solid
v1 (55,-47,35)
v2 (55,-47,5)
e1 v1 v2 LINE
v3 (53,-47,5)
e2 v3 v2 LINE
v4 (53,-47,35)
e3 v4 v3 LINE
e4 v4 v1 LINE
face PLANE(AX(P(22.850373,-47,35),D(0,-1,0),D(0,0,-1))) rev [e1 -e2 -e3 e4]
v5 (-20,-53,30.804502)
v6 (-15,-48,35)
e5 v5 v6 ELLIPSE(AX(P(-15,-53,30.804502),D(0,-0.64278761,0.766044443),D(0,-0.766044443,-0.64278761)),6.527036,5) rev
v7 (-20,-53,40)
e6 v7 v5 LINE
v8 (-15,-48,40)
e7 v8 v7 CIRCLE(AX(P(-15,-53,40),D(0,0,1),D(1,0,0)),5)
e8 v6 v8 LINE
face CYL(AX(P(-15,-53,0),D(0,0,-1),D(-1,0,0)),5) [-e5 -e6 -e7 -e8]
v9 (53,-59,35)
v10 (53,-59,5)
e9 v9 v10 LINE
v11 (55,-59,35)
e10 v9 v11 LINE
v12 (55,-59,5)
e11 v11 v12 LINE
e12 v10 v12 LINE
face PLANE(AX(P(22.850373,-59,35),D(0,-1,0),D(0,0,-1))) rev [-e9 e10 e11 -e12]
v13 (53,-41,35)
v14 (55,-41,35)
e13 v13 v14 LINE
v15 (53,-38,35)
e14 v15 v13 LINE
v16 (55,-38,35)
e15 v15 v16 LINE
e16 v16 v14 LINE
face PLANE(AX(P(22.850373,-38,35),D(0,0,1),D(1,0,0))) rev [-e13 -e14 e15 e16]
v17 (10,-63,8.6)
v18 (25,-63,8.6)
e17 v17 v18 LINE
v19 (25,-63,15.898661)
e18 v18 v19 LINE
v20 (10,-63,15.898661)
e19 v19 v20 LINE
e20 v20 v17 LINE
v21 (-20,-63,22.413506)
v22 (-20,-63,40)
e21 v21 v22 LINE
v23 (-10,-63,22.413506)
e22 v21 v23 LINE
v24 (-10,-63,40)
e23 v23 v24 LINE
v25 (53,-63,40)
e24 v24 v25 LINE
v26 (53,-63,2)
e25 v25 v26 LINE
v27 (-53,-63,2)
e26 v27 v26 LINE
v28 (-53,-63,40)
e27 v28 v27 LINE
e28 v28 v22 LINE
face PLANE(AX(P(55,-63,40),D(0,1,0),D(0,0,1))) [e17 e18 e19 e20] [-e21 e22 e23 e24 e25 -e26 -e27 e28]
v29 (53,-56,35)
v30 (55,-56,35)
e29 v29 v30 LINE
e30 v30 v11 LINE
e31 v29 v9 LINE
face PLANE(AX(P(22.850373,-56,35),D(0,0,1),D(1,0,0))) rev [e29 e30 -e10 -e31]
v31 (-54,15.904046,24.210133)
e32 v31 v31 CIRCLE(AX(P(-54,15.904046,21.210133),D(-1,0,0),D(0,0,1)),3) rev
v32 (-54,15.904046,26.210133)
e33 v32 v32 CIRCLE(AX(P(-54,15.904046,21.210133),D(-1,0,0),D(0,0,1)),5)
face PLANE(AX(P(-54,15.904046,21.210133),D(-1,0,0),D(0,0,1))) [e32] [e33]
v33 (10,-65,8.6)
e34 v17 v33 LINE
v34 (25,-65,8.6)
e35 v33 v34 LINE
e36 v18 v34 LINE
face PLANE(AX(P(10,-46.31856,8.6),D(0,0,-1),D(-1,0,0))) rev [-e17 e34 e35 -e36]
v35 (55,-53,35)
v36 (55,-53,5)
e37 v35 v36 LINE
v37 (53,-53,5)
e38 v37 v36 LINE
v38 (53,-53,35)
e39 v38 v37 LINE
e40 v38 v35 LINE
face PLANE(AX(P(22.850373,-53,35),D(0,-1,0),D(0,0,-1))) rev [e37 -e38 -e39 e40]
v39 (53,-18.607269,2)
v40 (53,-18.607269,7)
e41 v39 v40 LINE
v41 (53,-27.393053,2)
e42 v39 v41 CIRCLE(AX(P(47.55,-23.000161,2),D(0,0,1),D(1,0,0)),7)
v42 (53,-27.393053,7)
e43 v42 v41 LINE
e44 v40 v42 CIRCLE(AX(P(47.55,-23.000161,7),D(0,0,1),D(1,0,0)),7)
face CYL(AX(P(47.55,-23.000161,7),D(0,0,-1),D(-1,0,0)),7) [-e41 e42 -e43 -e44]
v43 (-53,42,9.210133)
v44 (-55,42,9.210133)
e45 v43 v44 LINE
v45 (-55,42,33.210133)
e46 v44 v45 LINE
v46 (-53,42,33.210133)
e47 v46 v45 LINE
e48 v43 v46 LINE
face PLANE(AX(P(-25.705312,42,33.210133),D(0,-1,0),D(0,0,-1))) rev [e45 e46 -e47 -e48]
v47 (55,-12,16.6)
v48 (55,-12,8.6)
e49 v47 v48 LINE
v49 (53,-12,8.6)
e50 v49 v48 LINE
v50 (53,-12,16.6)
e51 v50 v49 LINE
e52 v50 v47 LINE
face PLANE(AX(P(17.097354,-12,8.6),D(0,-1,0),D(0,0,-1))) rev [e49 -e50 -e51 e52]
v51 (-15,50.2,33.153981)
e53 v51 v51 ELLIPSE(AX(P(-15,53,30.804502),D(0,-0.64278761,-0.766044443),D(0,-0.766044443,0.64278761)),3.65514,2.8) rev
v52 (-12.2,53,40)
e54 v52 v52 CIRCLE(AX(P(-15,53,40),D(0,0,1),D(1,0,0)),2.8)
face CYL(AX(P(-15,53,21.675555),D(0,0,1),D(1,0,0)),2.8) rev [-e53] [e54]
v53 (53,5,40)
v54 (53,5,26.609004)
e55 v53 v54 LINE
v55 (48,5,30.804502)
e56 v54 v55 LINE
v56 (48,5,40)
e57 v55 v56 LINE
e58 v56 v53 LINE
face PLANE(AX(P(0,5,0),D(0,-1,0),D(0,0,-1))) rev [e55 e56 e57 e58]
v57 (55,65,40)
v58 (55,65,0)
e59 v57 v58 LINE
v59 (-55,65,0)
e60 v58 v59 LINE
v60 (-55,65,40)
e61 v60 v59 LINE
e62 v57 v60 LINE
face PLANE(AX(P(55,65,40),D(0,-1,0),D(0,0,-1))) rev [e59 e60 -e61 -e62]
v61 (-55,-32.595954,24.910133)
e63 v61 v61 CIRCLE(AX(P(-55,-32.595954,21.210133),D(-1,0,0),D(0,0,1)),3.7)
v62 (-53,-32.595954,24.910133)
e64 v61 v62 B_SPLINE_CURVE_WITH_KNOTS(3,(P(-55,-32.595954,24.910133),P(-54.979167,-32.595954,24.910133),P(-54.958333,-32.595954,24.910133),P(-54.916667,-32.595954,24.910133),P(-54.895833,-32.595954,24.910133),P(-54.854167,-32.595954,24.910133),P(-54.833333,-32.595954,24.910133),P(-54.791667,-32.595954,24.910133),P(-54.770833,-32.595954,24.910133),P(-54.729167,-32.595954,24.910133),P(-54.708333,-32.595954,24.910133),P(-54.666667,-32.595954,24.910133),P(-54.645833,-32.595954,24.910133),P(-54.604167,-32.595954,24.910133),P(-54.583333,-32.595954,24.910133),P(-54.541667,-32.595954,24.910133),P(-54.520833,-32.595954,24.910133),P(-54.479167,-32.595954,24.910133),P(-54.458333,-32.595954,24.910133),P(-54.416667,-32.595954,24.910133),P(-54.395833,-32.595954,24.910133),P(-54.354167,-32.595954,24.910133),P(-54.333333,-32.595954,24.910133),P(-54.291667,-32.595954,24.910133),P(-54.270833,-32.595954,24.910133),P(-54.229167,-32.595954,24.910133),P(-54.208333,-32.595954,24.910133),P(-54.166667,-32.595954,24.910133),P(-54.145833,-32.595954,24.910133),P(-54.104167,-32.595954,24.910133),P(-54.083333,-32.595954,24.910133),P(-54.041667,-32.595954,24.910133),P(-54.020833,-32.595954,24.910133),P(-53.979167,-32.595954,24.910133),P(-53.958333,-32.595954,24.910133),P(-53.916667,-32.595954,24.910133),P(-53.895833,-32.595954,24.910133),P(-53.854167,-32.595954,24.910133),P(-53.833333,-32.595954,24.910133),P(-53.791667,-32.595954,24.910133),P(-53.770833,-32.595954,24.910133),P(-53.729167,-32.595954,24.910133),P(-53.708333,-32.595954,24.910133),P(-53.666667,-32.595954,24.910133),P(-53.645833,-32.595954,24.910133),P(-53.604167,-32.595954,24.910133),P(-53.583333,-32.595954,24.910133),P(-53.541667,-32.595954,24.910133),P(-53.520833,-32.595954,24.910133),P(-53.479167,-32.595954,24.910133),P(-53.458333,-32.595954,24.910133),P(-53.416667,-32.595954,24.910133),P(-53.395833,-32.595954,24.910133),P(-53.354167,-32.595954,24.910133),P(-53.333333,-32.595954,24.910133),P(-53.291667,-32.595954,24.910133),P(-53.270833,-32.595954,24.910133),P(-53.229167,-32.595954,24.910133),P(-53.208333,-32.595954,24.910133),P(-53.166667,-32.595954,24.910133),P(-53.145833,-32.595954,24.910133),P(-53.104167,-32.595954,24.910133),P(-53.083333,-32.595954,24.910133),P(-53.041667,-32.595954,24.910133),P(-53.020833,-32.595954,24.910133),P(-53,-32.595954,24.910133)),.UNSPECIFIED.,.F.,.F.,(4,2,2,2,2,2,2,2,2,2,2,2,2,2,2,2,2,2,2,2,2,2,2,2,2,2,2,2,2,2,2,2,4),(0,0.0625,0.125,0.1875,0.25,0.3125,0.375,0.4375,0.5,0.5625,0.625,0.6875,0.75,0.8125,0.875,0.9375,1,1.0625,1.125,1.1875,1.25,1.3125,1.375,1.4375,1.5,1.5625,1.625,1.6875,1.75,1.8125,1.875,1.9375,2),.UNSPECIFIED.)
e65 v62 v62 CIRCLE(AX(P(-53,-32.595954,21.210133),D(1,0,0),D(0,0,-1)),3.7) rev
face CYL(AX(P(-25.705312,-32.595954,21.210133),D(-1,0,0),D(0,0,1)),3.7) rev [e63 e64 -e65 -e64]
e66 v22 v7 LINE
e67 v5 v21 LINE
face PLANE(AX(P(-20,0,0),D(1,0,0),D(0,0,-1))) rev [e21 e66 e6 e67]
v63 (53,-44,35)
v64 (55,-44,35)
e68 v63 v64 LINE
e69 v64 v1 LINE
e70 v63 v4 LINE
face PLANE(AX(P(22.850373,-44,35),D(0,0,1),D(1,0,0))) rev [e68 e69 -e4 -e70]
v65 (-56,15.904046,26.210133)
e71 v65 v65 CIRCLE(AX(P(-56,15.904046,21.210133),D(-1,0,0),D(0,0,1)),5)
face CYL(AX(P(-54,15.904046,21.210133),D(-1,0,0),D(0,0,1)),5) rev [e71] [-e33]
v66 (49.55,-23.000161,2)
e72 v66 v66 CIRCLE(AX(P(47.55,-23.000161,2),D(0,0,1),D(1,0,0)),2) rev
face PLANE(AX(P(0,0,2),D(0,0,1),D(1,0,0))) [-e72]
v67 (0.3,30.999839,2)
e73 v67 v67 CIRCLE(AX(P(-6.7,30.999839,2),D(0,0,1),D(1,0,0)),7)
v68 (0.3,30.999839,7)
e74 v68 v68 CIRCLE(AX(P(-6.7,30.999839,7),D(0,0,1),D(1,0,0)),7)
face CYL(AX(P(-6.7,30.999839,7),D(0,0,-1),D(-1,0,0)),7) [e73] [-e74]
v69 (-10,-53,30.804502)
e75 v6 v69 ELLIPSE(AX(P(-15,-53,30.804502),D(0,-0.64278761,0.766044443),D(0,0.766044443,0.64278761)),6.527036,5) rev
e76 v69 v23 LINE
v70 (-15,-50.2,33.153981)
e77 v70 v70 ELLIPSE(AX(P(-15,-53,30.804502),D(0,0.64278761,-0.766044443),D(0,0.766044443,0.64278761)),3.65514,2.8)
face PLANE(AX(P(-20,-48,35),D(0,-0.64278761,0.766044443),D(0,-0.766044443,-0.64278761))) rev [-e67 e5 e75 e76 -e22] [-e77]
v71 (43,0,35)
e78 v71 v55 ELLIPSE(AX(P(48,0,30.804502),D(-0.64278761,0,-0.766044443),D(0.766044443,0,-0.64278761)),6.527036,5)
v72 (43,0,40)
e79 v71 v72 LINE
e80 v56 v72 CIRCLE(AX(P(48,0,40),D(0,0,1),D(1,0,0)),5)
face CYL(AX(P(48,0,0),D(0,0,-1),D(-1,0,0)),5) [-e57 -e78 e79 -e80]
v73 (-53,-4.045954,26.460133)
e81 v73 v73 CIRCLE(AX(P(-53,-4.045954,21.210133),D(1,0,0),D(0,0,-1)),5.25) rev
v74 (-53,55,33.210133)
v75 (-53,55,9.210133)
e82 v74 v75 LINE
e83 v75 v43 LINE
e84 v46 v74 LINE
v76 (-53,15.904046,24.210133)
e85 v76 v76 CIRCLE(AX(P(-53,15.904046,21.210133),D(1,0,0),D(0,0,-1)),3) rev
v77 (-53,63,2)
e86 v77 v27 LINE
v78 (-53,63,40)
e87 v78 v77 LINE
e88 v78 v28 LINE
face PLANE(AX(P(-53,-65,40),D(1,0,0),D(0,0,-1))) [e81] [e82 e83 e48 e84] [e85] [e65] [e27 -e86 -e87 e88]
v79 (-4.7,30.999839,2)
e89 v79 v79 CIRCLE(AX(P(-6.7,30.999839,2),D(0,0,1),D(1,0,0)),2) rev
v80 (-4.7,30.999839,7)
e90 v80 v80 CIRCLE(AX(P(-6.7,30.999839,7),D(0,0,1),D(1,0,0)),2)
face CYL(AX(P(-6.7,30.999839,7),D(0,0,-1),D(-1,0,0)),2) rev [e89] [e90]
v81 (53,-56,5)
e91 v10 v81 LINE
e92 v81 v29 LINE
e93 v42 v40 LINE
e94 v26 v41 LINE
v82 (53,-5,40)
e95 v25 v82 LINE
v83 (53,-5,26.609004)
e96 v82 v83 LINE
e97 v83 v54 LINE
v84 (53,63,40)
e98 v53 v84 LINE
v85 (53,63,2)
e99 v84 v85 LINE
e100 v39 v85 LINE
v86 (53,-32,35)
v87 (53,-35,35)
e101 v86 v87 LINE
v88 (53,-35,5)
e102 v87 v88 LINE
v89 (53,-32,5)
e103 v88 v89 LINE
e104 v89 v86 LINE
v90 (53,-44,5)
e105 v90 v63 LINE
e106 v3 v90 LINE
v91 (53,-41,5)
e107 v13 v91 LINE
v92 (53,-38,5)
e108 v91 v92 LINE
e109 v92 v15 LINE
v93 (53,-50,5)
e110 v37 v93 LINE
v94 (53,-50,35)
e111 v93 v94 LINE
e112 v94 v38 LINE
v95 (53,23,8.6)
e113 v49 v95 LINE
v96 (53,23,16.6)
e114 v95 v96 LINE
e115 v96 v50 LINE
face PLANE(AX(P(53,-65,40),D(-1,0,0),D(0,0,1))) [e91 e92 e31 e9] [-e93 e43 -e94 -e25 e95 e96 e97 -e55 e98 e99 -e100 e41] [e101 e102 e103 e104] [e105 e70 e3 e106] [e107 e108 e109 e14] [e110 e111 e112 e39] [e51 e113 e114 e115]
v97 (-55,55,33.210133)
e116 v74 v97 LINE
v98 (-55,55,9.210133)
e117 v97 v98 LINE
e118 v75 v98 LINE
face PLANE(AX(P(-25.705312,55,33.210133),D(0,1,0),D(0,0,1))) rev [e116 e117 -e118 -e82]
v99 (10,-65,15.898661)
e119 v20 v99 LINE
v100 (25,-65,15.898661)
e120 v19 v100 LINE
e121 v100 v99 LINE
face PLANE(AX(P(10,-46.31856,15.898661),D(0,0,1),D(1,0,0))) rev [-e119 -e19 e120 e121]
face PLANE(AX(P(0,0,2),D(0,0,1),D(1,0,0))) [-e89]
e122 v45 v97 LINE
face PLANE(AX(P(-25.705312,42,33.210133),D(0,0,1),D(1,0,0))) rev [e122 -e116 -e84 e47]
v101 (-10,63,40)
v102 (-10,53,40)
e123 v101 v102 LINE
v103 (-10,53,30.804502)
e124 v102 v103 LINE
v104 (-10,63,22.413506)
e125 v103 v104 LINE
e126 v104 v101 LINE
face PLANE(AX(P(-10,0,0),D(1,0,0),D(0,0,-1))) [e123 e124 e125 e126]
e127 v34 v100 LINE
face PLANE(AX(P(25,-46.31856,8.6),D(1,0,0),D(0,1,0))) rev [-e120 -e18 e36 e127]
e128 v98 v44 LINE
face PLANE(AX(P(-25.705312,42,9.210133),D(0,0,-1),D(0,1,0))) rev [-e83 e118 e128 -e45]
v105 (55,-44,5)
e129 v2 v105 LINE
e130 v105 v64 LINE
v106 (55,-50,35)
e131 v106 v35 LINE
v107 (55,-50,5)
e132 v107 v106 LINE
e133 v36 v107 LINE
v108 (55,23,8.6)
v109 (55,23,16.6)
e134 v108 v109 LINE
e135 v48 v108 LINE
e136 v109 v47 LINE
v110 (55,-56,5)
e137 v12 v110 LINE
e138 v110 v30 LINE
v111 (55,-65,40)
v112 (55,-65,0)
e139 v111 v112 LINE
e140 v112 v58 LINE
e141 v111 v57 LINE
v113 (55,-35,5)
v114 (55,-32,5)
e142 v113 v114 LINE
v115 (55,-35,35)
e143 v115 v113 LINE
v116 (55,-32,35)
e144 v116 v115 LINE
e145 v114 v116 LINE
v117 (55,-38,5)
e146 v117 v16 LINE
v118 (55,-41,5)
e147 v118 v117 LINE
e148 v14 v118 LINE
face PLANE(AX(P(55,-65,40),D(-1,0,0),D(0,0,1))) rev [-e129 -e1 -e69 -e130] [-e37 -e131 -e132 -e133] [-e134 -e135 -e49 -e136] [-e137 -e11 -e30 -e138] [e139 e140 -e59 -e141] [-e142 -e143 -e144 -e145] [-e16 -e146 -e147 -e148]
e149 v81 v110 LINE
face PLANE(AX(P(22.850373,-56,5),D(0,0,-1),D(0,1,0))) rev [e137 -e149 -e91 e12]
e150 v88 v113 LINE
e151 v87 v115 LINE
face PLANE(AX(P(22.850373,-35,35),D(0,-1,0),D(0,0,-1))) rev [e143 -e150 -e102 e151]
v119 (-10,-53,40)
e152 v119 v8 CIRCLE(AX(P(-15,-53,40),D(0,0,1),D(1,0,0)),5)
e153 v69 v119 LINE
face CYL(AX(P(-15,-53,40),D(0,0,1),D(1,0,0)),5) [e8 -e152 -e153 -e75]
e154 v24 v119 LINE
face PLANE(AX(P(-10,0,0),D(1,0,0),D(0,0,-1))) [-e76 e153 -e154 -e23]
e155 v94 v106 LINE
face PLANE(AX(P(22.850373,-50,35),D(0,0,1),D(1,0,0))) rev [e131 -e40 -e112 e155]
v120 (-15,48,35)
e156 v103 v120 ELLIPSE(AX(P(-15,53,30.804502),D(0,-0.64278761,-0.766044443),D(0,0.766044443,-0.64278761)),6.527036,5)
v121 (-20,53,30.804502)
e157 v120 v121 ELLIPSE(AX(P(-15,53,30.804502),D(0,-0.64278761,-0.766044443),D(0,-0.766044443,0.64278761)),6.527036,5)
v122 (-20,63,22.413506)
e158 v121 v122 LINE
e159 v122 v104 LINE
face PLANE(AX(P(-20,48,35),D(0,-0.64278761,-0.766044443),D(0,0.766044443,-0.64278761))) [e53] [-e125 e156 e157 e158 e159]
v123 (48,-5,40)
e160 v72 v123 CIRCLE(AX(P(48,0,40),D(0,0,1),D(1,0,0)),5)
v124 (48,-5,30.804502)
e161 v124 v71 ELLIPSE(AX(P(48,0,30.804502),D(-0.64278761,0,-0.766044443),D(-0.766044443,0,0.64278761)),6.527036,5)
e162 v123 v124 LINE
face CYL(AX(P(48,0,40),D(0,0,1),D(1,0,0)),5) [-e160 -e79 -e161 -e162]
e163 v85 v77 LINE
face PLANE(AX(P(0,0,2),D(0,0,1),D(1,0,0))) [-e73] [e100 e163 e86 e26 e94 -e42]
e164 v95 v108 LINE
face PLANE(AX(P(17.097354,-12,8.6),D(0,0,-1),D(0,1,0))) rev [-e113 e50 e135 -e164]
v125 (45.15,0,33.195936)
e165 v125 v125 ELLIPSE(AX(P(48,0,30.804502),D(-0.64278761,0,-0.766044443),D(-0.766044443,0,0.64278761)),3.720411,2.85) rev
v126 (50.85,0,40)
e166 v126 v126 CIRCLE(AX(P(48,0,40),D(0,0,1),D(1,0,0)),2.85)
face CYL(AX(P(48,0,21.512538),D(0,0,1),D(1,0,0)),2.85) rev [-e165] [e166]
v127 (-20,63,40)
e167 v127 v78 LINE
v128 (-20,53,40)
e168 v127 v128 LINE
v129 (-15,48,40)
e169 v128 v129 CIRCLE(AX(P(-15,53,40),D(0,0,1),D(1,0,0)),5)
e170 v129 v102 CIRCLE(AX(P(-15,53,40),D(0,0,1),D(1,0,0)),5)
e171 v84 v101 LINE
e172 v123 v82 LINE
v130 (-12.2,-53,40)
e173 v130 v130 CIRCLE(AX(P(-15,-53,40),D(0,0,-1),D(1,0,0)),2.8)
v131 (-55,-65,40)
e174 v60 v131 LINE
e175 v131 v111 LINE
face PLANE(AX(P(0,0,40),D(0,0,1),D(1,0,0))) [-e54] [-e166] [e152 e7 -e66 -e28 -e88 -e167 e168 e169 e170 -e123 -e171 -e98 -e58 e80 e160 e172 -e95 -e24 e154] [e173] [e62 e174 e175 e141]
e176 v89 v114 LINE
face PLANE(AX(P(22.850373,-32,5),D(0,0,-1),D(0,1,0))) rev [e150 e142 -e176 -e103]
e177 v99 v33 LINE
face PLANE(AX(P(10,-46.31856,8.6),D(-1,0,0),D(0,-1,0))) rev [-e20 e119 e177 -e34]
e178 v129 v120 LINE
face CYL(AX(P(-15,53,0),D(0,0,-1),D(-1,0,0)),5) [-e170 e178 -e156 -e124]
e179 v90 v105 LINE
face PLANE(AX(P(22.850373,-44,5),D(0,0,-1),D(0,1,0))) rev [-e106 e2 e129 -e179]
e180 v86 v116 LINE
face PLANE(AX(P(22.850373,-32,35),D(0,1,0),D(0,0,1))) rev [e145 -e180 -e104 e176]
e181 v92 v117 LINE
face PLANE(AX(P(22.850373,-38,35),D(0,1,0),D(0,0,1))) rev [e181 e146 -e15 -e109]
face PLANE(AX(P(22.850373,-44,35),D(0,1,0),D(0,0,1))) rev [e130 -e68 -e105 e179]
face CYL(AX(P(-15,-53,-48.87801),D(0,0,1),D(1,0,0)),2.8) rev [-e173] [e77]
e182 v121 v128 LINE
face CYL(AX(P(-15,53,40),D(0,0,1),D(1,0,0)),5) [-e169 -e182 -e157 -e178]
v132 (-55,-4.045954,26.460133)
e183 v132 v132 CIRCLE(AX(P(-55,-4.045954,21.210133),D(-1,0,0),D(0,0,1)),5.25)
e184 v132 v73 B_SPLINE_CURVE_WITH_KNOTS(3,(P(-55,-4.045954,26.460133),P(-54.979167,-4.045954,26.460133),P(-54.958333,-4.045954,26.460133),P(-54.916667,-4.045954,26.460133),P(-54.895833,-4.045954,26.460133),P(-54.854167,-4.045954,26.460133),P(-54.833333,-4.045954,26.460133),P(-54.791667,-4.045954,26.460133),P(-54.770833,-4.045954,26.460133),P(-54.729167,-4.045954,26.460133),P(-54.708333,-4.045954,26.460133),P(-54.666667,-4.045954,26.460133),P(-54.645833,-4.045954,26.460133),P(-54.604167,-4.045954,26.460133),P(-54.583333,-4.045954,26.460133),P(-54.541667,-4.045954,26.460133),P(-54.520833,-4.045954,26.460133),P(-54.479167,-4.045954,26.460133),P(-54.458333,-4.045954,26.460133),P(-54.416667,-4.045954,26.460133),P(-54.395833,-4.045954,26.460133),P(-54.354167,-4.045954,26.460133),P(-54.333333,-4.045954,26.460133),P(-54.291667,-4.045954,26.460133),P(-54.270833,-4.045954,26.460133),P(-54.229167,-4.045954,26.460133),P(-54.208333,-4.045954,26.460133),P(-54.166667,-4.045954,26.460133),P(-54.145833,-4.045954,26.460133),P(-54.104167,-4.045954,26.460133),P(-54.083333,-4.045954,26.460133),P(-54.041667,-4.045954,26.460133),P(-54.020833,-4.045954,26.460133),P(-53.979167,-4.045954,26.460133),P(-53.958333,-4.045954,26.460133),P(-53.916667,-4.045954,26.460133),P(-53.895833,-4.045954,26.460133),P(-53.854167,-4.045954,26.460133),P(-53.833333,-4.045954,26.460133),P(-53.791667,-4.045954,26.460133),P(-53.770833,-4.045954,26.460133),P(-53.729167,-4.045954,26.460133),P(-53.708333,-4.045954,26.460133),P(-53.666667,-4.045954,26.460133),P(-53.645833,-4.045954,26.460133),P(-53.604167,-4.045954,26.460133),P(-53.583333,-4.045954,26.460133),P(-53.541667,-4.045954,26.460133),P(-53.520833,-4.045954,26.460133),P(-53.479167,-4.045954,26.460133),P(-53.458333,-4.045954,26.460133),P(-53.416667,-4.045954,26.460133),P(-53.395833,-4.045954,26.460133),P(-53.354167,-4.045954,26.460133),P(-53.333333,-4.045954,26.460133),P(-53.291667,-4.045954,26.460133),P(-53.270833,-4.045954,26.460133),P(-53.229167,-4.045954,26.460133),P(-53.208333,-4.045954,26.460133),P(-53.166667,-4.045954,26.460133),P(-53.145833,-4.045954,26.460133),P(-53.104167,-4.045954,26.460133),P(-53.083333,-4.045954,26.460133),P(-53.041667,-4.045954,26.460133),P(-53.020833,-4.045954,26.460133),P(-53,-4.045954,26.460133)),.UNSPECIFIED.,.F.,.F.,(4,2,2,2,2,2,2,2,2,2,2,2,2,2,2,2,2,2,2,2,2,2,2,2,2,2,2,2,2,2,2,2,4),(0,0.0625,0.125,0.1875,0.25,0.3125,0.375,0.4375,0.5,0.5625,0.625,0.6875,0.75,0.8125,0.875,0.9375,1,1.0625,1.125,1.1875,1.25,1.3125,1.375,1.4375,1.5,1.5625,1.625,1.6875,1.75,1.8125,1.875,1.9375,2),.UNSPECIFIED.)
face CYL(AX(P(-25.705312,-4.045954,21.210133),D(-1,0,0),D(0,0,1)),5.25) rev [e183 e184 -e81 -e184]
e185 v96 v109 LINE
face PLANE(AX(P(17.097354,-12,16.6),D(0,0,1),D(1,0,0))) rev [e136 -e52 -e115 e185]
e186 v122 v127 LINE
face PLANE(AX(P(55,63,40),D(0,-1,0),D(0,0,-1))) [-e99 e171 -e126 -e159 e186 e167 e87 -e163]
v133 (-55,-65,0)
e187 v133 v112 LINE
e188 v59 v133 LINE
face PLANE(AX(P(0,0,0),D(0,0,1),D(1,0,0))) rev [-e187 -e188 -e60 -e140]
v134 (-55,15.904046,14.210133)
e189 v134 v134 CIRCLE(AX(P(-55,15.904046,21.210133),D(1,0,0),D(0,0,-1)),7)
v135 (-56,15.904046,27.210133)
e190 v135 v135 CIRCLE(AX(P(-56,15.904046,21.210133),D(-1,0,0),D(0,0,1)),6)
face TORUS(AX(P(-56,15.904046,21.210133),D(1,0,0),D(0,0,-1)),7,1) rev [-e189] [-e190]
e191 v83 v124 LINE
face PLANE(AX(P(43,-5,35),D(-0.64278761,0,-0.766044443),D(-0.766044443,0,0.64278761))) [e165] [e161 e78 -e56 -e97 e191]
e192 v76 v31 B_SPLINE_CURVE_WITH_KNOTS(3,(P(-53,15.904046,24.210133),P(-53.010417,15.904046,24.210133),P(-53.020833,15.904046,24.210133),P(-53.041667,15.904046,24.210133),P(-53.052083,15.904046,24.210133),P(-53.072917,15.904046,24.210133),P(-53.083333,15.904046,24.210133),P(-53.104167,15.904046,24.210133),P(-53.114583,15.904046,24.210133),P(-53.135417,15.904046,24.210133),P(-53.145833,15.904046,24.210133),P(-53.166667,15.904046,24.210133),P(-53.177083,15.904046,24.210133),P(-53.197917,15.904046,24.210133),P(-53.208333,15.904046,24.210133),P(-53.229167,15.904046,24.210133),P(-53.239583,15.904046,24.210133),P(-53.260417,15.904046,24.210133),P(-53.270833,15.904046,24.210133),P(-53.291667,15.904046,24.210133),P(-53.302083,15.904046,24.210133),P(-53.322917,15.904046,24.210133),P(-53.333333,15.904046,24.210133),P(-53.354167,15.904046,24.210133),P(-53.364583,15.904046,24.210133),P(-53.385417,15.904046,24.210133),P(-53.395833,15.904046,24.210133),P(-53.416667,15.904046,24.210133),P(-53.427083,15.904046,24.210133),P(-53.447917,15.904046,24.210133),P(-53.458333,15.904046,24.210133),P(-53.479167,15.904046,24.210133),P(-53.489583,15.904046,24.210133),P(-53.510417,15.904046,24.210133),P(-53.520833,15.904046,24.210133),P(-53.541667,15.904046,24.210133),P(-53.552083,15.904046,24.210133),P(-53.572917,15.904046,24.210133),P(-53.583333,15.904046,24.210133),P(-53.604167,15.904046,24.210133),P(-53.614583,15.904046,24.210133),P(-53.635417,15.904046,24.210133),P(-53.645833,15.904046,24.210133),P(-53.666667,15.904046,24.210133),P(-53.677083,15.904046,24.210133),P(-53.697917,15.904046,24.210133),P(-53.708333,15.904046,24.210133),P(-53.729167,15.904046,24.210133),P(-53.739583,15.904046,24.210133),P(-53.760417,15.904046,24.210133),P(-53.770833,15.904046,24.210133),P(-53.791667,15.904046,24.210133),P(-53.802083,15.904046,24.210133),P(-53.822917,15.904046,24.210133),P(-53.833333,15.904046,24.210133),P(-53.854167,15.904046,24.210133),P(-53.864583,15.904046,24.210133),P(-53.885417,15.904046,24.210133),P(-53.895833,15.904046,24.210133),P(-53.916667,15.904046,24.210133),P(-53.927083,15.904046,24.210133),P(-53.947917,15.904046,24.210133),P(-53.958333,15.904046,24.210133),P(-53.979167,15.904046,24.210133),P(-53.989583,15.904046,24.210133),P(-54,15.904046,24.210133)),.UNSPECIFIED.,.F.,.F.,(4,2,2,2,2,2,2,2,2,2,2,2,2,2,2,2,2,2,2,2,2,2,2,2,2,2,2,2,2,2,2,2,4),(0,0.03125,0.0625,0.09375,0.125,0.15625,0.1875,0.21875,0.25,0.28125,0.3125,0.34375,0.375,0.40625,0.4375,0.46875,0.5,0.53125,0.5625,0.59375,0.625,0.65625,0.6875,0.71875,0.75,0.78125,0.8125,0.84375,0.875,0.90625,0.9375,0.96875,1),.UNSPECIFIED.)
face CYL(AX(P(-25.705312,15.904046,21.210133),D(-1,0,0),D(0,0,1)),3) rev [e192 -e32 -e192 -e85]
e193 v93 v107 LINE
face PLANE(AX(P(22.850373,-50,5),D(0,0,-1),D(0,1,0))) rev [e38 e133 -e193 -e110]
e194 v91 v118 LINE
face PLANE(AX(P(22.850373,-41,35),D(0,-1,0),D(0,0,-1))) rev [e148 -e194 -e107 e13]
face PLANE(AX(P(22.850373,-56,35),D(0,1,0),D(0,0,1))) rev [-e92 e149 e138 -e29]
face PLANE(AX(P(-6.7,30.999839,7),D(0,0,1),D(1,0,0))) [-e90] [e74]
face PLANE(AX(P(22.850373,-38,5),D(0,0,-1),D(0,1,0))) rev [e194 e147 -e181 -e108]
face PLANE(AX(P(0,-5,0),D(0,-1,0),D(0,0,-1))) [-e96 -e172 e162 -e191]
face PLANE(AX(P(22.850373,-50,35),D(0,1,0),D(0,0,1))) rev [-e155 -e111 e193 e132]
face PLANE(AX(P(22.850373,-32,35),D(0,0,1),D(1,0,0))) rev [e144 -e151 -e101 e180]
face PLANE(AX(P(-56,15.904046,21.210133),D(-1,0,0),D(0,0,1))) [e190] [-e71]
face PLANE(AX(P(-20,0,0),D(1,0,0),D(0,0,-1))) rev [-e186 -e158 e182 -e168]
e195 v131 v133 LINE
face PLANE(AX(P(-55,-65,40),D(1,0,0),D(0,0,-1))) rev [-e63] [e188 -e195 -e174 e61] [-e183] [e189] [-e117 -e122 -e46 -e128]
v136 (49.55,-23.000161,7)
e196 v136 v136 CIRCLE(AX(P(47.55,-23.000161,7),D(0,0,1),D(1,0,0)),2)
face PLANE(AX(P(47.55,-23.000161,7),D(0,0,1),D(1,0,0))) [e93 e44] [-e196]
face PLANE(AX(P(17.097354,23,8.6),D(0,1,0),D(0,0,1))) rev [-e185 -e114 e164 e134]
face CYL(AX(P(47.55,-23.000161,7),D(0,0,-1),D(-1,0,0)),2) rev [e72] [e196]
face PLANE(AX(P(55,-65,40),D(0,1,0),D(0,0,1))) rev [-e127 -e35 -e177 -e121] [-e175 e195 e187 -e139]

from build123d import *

# Parameters (mm, degrees)
SKETCH1_W                = 110
SKETCH1_H                = 130
BOSS_EXTRUDE1_DEPTH      = 40
SHELL1_T                 = -2
SKETCH2_W                = 15
SKETCH2_H                = 7.298661228
CUT_EXTRUDE1_DEPTH       = 2
SKETCH3_W                = 8
SKETCH3_H                = 35
CUT_EXTRUDE2_DEPTH       = 2
SKETCH5_R                = 3
SKETCH5_R_2              = 5.25
SKETCH5_R_3              = 3.7
SKETCH5_W                = 24
SKETCH5_H                = 13
CUT_EXTRUDE3_DEPTH       = 2
SKETCH6_W                = 30
SKETCH6_H                = 3
CUT_EXTRUDE4_DEPTH       = 2
SKETCH7_R                = 7
SKETCH7_R_2              = 2
BOSS_EXTRUDE2_DEPTH      = 5
BOSS_EXTRUDE3_DEPTH      = 5
FILLET1_R                = 5
BOSS_EXTRUDE4_DEPTH      = 5
BOSS_EXTRUDE4_DEPTH_BACK = 5
FILLET2_R                = 5
CUT_EXTRUDE9_REACH       = 96.074
SKETCH11_R               = 2.8
CUT_EXTRUDE10_REACH      = 96.074
SKETCH13_R               = 2.85
FILLET1_OF_MIRROR1_R     = 5
SKETCH14_R               = 5
CUT_EXTRUDE11_DEPTH      = 1
BOSS_EXTRUDE5_START      = 1
SKETCH15_R               = 6
SKETCH15_R_2             = 5
BOSS_EXTRUDE5_DEPTH      = 1
FILLET3_R                = 1


with BuildPart() as part:
    # Sketch1 → Boss-Extrude1 (new body)
    with BuildSketch(Plane.XY):
        Rectangle(SKETCH1_W, SKETCH1_H)
    extrude(amount=BOSS_EXTRUDE1_DEPTH)

    # Shell1
    shell1_openings = [part.faces().sort_by_distance(p)[0] for p in [
        (0, 0, 40),
    ]]
    offset(amount=SHELL1_T, openings=shell1_openings, kind=Kind.INTERSECTION)

    # Sketch2 → Cut-Extrude1 (cut)
    with BuildSketch(Plane.XZ.offset(65)):
        with Locations((17.5, 12.249330614)):
            Rectangle(SKETCH2_W, SKETCH2_H)
    extrude(amount=-CUT_EXTRUDE1_DEPTH, mode=Mode.SUBTRACT)

    # Sketch3 → Cut-Extrude2 (cut)
    with BuildSketch(Plane(origin=(55, 0, 0), x_dir=(0, 0, -1), z_dir=(1, 0, 0))):
        with Locations((-12.6, 5.5)):
            Rectangle(SKETCH3_W, SKETCH3_H)
    extrude(amount=-CUT_EXTRUDE2_DEPTH, mode=Mode.SUBTRACT)

    # Sketch5 → Cut-Extrude3 (cut)
    with BuildSketch(Plane.ZY.offset(55)):
        with Locations((21.210132709, 15.904045732)):
            Circle(SKETCH5_R)
        with Locations((21.210132709, -4.045954268)):
            Circle(SKETCH5_R_2)
        with Locations((21.210132709, -32.595954268)):
            Circle(SKETCH5_R_3)
        with Locations((21.210132709, 48.5)):
            Rectangle(SKETCH5_W, SKETCH5_H)
    extrude(amount=-CUT_EXTRUDE3_DEPTH, mode=Mode.SUBTRACT)

    # Sketch6 → Cut-Extrude4 (cut)
    with BuildSketch(Plane(origin=(55, 0, 0), x_dir=(0, 0, -1), z_dir=(1, 0, 0))):
        with Locations((-20, -33.5)):
            Rectangle(SKETCH6_W, SKETCH6_H)
        with Locations((-20, -39.5)):
            Rectangle(SKETCH6_W, SKETCH6_H)
        with Locations((-20, -45.5)):
            Rectangle(SKETCH6_W, SKETCH6_H)
        with Locations((-20, -51.5)):
            Rectangle(SKETCH6_W, SKETCH6_H)
        with Locations((-20, -57.5)):
            Rectangle(SKETCH6_W, SKETCH6_H)
    extrude(amount=-CUT_EXTRUDE4_DEPTH, mode=Mode.SUBTRACT)

    # Sketch7 → Boss-Extrude2 (add)
    # profile 1 of 2: a face of its own
    with BuildSketch(Plane.XY.offset(2)):
        with Locations((-6.7, 30.999839281)):
            Circle(SKETCH7_R)
        with Locations((-6.7, 30.999839281)):
            Circle(SKETCH7_R_2, mode=Mode.SUBTRACT)
    # profile 2 of 2: a face of its own
    with BuildSketch(Plane.XY.offset(2)):
        with Locations((47.55, -23.000160719)):
            Circle(SKETCH7_R)
        with Locations((47.55, -23.000160719)):
            Circle(SKETCH7_R_2, mode=Mode.SUBTRACT)
    extrude(amount=BOSS_EXTRUDE2_DEPTH)

    # Sketch9 → Boss-Extrude3 (add, symmetric)
    with BuildSketch(Plane(origin=(-15, 0, 0), x_dir=(0, 0, -1), z_dir=(1, 0, 0))):
        Polygon((-40, 63), (-40, 48), (-35, 48), (-22.413505532, 63), align=None)
    boss_extrude3 = extrude(amount=BOSS_EXTRUDE3_DEPTH, both=True)

    # Fillet1
    fillet1_edges = [part.edges().sort_by_distance(p)[0] for p in [
        (-10, 48, 37.5),
        (-20, 48, 37.5),
    ]]
    fillet(fillet1_edges, radius=FILLET1_R - 0.0001)  # a hair under: the kernel refuses the full size

    # Sketch10 → Boss-Extrude4 (add, two sides: drawn at the far end of the back side and taken through both)
    with BuildSketch(Plane(origin=(0, 0, 0), x_dir=(1, 0, 0), z_dir=(0, 1, 0)).offset(-BOSS_EXTRUDE4_DEPTH_BACK)):
        Polygon((53, -26.609003688), (53, -40), (43, -40), (43, -35), align=None)
    extrude(amount=BOSS_EXTRUDE4_DEPTH + BOSS_EXTRUDE4_DEPTH_BACK)

    # Fillet2
    fillet2_edges = [part.edges().sort_by_distance(p)[0] for p in [
        (43, 5, 37.5),
        (43, -5, 37.5),
    ]]
    fillet(fillet2_edges, radius=FILLET2_R - 0.0001)  # a hair under: the kernel refuses the full size

    # Cut-Extrude9: up to this plane
    cut_extrude9_end = Plane(origin=(-20, 48, 35), z_dir=(0, -0.6427876096865434, -0.7660444431189748))
    # Sketch11 → Cut-Extrude9 (cut, up to the surface)
    with BuildSketch(Plane.XY.offset(40), mode=Mode.PRIVATE) as cut_extrude9_sk1:
        with Locations((-15, 53)):
            Circle(SKETCH11_R)
    cut_extrude9_tool1 = split(extrude(cut_extrude9_sk1.sketch, amount=-CUT_EXTRUDE9_REACH, mode=Mode.PRIVATE), bisect_by=cut_extrude9_end, keep=Keep.BOTH, mode=Mode.PRIVATE)
    cut_extrude9 = cut_extrude9_tool1.solids().sort_by_distance((-15, 53, 40))[0]
    add(cut_extrude9, mode=Mode.SUBTRACT)

    # Cut-Extrude10: up to this plane
    cut_extrude10_end = Plane(origin=(43, -5, 35), z_dir=(-0.6427876096865458, 0, -0.7660444431189727))
    # Sketch13 → Cut-Extrude10 (cut, up to the surface)
    with BuildSketch(Plane.XY.offset(40), mode=Mode.PRIVATE) as cut_extrude10_sk1:
        with Locations((48, 0)):
            Circle(SKETCH13_R)
    cut_extrude10_tool1 = split(extrude(cut_extrude10_sk1.sketch, amount=-CUT_EXTRUDE10_REACH, mode=Mode.PRIVATE), bisect_by=cut_extrude10_end, keep=Keep.BOTH, mode=Mode.PRIVATE)
    add(cut_extrude10_tool1.solids().sort_by_distance((48, 0, 40))[0], mode=Mode.SUBTRACT)

    # Mirror1: Boss-Extrude3, Cut-Extrude9 across plane
    add(boss_extrude3.mirror(Plane.ZX))
    add(cut_extrude9.mirror(Plane.ZX), mode=Mode.SUBTRACT)

    # Fillet1 of Mirror1
    fillet1_of_mirror1_edges = [part.edges().sort_by_distance(p)[0] for p in [
        (-10, -48, 37.5),
        (-20, -48, 37.5),
    ]]
    fillet(fillet1_of_mirror1_edges, radius=FILLET1_OF_MIRROR1_R - 0.0001)  # a hair under: the kernel refuses the full size

    # Sketch14 → Cut-Extrude11 (cut)
    with BuildSketch(Plane.ZY.offset(55)):
        with Locations((21.210132709, 15.904045732)):
            Circle(SKETCH14_R)
    extrude(amount=-CUT_EXTRUDE11_DEPTH, mode=Mode.SUBTRACT)

    # Sketch15 → Boss-Extrude5 (add)
    with BuildSketch(Plane.ZY.offset(55).offset(BOSS_EXTRUDE5_START)):
        with Locations(Location((21.210132709, 15.904045732, 0), (0, 0, 180))):
            Circle(SKETCH15_R)
        with Locations((21.210132709, 15.904045732)):
            Circle(SKETCH15_R_2, mode=Mode.SUBTRACT)
    extrude(amount=-BOSS_EXTRUDE5_DEPTH)

    # Fillet3
    fillet3_edges = [part.edges().sort_by_distance(p)[0] for p in [
        (-55, 15.904045732, 27.210132709),
    ]]
    fillet(fillet3_edges, radius=FILLET3_R - 0.0001)  # a hair under: the kernel refuses the full size


solid = part.part
